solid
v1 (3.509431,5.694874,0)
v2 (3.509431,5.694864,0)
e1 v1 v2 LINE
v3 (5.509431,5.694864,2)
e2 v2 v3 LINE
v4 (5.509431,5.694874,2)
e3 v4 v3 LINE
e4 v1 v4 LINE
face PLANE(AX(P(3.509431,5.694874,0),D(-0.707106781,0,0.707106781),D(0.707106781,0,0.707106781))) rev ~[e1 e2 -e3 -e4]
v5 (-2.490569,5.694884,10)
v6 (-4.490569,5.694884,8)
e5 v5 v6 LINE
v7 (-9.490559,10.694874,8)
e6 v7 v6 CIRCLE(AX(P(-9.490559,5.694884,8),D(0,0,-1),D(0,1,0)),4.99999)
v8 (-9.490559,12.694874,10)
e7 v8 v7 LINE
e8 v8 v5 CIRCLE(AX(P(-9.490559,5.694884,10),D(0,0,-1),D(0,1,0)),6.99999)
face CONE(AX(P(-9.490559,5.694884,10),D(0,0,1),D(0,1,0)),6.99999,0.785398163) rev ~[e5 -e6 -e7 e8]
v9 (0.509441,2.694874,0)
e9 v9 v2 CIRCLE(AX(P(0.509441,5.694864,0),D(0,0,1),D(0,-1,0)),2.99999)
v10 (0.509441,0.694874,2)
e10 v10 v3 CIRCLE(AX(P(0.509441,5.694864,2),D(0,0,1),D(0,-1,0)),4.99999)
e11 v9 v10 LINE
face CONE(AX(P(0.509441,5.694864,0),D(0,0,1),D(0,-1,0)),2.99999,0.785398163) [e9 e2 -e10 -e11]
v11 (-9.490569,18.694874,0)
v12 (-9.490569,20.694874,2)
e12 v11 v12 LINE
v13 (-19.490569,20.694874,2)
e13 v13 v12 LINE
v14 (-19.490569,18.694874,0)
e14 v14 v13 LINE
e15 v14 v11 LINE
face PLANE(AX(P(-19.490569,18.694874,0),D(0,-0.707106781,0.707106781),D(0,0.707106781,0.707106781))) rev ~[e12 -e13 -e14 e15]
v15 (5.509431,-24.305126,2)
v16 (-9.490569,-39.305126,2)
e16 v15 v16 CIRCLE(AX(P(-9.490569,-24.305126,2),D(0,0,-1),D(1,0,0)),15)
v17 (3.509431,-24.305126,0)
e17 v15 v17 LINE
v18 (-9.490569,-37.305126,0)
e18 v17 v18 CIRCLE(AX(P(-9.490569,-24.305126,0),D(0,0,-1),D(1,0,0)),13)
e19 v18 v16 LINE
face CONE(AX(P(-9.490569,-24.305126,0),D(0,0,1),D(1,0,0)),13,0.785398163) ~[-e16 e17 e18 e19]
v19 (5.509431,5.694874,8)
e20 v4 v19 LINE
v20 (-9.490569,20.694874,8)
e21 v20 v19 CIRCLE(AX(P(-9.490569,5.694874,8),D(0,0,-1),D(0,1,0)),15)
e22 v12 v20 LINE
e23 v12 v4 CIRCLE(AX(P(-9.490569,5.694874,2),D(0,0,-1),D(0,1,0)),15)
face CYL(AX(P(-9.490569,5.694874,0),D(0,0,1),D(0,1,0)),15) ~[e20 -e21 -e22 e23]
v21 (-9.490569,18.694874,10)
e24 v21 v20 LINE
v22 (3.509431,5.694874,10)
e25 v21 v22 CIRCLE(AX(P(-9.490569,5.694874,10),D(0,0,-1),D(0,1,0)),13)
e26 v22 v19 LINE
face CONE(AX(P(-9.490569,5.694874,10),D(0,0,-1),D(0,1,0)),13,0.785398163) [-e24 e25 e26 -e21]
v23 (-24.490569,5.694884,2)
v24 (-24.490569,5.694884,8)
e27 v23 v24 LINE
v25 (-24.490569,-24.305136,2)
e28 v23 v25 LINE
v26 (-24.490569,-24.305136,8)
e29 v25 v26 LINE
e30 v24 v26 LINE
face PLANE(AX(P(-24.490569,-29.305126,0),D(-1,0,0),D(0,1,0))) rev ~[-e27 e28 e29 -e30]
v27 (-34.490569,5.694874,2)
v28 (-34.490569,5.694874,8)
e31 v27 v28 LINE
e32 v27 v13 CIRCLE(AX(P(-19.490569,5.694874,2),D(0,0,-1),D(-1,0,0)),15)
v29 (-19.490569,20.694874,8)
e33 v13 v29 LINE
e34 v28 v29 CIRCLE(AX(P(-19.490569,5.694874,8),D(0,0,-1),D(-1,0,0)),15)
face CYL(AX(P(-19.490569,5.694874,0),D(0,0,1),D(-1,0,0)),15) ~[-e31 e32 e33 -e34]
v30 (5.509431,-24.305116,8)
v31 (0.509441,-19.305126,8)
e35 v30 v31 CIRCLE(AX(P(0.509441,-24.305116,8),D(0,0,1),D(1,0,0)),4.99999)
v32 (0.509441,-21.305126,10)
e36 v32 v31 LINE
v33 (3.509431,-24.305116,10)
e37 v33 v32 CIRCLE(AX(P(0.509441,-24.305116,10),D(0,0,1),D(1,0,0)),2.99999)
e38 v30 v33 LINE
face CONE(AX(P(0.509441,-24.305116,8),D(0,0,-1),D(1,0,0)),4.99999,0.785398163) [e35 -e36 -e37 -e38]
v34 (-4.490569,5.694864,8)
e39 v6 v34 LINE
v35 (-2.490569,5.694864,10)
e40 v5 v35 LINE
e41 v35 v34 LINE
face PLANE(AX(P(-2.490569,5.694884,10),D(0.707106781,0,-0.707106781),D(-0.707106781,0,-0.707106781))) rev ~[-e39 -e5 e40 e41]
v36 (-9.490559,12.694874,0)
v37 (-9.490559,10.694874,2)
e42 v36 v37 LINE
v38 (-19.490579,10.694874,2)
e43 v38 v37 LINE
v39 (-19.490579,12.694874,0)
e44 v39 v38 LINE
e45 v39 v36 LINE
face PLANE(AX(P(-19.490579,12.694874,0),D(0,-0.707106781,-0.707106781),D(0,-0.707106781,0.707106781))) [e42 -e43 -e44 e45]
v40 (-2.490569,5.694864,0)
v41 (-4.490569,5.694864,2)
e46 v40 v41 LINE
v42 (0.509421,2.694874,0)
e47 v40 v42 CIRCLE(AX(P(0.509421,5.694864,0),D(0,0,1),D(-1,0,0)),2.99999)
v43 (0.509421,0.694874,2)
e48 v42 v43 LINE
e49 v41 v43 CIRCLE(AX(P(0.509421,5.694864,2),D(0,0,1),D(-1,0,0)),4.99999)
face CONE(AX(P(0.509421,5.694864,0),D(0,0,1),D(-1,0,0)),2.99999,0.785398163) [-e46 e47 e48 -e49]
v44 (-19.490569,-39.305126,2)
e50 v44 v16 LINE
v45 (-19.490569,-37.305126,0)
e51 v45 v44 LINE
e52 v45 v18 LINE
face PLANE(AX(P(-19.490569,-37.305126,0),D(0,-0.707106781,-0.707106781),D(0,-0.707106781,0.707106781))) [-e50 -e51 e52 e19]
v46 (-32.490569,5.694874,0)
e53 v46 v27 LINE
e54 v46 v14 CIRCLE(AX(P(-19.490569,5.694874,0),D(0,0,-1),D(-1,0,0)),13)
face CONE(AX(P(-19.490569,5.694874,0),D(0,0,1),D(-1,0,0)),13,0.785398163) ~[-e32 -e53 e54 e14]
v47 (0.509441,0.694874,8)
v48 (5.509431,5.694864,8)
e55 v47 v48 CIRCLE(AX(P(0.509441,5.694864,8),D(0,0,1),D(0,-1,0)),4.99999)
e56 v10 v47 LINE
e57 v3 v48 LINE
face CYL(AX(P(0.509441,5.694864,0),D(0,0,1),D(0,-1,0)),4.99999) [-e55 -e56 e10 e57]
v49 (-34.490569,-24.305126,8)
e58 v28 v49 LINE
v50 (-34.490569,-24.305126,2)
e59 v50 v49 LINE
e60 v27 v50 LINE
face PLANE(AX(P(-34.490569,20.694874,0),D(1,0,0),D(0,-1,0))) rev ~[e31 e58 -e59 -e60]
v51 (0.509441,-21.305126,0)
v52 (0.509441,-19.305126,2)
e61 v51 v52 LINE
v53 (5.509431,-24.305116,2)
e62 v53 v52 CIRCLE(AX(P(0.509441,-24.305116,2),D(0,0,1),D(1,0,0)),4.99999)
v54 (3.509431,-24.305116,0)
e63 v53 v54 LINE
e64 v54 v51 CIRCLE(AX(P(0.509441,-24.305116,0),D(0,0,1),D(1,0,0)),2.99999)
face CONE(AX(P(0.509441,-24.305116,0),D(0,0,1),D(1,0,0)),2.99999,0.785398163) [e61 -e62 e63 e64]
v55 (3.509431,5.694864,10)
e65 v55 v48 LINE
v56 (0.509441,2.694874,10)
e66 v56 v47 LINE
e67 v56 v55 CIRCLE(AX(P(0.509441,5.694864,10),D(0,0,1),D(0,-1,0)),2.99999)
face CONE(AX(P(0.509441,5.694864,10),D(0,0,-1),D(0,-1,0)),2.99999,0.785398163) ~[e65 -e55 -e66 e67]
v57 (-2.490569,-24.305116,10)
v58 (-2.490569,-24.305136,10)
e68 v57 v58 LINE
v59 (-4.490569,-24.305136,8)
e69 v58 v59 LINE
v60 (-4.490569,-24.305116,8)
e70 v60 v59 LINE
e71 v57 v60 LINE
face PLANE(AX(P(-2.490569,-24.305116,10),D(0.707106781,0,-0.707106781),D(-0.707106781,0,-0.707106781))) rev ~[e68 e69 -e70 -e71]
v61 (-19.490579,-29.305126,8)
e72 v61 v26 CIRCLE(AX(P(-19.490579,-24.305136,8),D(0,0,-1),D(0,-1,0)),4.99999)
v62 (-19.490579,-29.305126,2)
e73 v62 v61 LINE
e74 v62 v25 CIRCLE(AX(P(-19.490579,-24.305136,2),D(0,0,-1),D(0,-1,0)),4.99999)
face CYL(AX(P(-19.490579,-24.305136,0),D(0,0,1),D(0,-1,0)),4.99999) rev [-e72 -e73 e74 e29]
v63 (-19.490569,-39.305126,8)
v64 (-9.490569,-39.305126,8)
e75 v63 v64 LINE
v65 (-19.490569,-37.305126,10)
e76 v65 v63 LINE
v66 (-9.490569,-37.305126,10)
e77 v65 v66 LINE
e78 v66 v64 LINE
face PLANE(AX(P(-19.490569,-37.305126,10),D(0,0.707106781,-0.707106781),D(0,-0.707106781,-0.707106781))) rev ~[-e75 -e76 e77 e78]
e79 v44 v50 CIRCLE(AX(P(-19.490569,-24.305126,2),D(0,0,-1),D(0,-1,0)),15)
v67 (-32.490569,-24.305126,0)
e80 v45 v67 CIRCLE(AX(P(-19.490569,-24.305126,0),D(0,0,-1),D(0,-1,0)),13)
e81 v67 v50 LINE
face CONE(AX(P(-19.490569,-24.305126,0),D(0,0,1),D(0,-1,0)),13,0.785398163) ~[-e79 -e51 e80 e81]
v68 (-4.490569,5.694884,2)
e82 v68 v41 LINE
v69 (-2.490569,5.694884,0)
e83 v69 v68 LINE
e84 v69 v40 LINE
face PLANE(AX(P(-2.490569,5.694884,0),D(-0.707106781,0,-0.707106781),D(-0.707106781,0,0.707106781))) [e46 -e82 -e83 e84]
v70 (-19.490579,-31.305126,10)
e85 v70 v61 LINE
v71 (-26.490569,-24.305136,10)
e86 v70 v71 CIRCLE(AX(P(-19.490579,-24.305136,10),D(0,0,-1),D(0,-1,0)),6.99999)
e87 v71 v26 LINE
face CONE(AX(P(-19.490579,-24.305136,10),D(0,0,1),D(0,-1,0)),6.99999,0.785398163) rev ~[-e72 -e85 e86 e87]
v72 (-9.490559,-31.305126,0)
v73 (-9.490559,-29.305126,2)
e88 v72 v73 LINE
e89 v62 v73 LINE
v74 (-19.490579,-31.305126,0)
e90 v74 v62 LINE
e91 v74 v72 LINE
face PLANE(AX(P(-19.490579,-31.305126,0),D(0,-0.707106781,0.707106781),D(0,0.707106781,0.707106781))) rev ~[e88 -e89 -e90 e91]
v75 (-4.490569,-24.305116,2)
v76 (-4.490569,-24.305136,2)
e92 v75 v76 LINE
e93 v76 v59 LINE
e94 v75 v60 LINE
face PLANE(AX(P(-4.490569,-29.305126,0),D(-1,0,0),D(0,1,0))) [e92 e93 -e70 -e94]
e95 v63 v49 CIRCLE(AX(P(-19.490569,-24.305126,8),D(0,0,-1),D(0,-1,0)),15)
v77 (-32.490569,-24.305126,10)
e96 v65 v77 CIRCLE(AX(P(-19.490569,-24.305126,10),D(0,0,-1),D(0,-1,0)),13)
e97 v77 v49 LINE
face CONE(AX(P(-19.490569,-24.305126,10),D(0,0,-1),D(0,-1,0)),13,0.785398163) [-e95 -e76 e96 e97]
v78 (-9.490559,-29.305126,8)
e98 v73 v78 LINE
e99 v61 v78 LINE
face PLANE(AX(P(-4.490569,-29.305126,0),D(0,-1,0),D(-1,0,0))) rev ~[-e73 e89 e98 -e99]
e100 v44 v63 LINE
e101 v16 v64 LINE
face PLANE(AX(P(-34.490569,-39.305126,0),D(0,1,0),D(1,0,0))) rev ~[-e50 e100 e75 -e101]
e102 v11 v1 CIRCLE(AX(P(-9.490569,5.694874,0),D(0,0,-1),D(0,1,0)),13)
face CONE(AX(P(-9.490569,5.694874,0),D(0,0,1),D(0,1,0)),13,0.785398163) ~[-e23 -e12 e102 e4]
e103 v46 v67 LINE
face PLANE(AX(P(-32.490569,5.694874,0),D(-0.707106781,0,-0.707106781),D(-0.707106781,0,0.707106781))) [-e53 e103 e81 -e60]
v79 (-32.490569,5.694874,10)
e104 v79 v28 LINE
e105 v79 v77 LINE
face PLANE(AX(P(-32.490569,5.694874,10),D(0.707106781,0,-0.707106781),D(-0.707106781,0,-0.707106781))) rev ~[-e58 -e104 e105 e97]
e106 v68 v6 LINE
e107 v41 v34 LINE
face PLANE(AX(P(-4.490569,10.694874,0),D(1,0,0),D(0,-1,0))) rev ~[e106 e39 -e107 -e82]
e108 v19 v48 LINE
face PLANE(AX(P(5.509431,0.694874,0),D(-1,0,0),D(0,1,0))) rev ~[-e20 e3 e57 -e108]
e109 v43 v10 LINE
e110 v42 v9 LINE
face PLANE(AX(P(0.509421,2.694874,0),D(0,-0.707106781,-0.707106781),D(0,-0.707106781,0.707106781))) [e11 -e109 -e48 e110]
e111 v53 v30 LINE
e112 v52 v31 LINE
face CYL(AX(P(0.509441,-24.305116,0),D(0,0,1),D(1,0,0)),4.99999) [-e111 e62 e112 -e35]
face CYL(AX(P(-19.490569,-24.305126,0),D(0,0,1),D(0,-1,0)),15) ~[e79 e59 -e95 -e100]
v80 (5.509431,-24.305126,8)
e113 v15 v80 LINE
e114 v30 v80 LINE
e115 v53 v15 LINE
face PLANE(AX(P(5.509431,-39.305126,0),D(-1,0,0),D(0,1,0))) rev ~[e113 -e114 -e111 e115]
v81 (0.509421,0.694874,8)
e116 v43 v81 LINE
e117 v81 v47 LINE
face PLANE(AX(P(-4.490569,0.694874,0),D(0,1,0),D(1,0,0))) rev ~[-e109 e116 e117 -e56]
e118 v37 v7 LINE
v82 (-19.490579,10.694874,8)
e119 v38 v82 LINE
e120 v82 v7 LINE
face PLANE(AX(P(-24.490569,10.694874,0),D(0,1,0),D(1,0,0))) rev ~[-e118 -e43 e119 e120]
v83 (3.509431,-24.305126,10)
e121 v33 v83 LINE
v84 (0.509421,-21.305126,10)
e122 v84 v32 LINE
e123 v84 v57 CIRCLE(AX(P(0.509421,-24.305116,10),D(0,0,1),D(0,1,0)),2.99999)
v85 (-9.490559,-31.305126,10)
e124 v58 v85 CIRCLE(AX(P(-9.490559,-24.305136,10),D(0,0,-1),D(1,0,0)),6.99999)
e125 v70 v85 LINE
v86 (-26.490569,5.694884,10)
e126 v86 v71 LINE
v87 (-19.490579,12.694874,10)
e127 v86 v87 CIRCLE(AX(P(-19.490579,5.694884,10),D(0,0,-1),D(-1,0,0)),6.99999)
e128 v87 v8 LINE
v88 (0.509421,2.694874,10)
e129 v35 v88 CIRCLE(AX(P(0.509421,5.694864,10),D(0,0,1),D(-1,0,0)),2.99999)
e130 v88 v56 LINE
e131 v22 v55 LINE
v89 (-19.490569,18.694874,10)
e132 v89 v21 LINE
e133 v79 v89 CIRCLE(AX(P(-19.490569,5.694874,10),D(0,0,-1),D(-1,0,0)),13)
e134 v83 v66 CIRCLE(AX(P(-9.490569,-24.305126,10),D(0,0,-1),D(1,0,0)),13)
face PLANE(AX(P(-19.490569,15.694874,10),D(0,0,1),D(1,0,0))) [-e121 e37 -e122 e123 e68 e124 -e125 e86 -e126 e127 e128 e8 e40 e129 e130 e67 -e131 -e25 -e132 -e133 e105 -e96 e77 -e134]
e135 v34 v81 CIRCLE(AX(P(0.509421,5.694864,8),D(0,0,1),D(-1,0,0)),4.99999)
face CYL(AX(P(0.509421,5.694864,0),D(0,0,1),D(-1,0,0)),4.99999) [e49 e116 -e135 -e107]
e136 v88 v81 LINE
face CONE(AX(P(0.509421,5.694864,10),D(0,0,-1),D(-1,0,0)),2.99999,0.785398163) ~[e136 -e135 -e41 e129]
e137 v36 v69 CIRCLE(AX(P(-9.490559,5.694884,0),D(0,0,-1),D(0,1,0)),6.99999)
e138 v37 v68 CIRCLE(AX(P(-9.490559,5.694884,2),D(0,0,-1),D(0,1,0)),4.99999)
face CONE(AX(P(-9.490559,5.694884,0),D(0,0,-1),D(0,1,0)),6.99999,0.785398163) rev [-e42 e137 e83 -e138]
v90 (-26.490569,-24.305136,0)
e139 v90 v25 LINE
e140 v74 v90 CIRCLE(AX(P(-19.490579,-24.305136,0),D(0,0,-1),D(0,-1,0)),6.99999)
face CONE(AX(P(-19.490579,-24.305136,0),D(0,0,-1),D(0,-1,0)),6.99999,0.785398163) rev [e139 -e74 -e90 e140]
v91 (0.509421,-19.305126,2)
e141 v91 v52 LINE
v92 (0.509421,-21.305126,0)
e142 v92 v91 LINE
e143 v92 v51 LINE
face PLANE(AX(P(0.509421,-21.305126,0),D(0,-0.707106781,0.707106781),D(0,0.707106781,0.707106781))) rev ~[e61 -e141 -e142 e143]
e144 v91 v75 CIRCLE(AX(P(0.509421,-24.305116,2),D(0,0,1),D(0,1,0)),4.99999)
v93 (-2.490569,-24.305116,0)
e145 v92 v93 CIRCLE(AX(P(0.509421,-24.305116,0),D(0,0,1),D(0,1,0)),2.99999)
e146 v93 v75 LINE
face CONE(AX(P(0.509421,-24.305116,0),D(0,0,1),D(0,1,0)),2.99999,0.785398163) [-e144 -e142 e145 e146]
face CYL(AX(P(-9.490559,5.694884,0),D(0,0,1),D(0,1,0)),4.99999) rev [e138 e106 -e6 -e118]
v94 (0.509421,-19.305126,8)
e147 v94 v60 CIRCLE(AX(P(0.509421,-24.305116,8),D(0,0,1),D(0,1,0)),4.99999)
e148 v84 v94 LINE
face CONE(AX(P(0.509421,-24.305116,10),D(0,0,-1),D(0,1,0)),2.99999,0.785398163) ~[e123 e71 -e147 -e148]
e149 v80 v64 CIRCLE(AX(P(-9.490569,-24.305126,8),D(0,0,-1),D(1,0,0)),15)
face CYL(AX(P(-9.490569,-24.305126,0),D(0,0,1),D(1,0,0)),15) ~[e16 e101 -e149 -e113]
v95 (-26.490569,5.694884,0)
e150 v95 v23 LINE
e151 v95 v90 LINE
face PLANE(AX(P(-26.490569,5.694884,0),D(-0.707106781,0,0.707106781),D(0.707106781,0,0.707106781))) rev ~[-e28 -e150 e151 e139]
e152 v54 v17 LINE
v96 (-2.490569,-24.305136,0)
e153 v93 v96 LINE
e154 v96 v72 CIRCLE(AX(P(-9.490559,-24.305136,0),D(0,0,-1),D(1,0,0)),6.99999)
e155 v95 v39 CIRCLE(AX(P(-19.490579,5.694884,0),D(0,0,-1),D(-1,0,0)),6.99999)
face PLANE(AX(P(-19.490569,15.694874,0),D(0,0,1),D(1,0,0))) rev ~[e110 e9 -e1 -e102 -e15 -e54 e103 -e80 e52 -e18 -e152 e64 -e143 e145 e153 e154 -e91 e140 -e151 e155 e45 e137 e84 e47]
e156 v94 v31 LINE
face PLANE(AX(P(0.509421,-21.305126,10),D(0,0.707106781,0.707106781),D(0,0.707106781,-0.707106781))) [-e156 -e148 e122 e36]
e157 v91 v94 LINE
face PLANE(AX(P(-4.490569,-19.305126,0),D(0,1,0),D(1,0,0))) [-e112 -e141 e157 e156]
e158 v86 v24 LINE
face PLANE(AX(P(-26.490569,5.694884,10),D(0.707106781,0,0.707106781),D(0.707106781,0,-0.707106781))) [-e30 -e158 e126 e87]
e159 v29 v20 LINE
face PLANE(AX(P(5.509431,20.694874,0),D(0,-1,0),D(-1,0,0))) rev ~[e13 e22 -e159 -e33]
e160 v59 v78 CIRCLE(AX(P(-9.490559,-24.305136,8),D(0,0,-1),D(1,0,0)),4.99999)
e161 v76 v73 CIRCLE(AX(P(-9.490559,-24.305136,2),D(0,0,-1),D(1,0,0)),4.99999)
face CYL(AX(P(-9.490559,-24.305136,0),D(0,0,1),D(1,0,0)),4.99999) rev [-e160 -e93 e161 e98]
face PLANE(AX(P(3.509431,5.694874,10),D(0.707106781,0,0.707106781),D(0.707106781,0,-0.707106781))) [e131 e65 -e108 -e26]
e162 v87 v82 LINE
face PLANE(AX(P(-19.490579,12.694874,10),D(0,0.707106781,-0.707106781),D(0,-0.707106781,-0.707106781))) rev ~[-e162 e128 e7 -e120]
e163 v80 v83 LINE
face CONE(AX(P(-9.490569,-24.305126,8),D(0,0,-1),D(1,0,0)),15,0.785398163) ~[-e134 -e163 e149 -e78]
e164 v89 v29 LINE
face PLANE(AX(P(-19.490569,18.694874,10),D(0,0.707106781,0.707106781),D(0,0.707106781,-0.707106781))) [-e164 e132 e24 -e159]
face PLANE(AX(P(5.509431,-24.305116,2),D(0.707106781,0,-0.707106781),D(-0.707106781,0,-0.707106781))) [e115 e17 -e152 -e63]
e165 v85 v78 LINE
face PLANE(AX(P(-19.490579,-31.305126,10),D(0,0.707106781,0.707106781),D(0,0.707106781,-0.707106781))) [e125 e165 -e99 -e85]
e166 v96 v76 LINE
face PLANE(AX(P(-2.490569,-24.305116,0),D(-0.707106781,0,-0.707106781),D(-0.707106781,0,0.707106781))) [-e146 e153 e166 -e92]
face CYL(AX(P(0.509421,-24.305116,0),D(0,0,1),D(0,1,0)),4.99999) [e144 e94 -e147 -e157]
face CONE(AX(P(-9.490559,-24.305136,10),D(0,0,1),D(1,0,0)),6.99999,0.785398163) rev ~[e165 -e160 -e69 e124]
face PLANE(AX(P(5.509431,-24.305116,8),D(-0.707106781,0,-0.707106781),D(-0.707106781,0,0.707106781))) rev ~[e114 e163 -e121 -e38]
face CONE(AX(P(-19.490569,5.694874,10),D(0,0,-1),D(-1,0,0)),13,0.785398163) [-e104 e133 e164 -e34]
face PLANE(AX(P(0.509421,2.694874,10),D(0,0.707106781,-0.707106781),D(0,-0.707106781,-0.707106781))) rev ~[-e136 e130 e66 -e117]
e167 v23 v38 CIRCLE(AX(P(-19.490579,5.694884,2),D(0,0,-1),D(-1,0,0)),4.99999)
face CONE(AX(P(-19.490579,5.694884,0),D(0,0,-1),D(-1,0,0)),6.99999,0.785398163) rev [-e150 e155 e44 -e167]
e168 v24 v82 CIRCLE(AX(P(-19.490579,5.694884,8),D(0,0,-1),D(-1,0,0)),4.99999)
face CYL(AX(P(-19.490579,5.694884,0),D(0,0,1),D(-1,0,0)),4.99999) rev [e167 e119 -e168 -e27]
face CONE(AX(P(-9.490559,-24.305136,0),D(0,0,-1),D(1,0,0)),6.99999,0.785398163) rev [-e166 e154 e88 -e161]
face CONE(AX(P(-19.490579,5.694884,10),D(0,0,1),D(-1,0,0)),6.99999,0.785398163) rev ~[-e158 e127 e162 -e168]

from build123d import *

# Parameters (mm, degrees)
F0_W         = 10
F0_H         = 10
F1_DEPTH     = 10
F2_R         = 4.99999
F3_R         = 15
F4_T1_DEPTH  = 30
F4_T3_DEPTH  = 10
F4_T5_DEPTH  = 1e-05
F4_T7_DEPTH  = 2e-05
F4_T9_DEPTH  = 2e-05
F4_T11_DEPTH = 10.00002
F4_T13_DEPTH = 30.00002
F4_T15_DEPTH = 2e-05
F4_T17_DEPTH = 1e-05
F4_T20_ANGLE = 90
F4_T22_ANGLE = 90
F4_T24_ANGLE = 90
F4_T26_ANGLE = 90
F4_T28_ANGLE = 90
F4_T30_ANGLE = 90
F4_T32_ANGLE = 90
F4_T34_ANGLE = 90
F4_T36_ANGLE = 90
F4_T38_ANGLE = 90
F4_T40_ANGLE = 90
F4_T42_ANGLE = 90
F4_T44_ANGLE = 90
F4_T46_ANGLE = 90
F4_T48_ANGLE = 90
F4_T50_ANGLE = 90
F4_T52_ANGLE = 90
F4_T54_ANGLE = 90
F4_T56_ANGLE = 90
F4_T58_ANGLE = 90
F4_T60_ANGLE = 90
F4_T62_ANGLE = 90
F4_T64_ANGLE = 90
F4_T66_ANGLE = 90


# Not quite as in the source:
# - a fillet or chamfer that OpenCascade refuses, or shapes differently, is made with other operations: its cross-section is extruded or revolved along the edge and cut away or added
# - a fillet or chamfer is up to 0.001 mm smaller than in the source, because OpenCascade refuses the exact size


with BuildPart() as f1:
    # F0 (on Top) → F1 (new body)
    with BuildSketch(Plane.XY):
        Polygon((-4.4905686265, 20.6948744461), (-34.4905686265, 20.6948744461), (-34.4905686265, 10.6948744461), (-24.4905686265, 10.6948744461), (-4.4905686265, 10.6948744461), align=None)
        Polygon((5.5094313735, 20.6948744461), (-4.4905686265, 20.6948744461), (-4.4905686265, 10.6948744461), (-4.4905686265, 0.6948744461), (5.5094313735, 0.6948744461), align=None)
        with Locations((0.5094313735, -24.3051255539)):
            Rectangle(F0_W, F0_H)
        Polygon((-24.4905686265, 10.6948744461), (-34.4905686265, 10.6948744461), (-34.4905686265, -39.3051255539), (-24.4905686265, -39.3051255539), (-24.4905686265, -29.3051255539), align=None)
        Polygon((-4.4905686265, -29.3051255539), (-24.4905686265, -29.3051255539), (-24.4905686265, -39.3051255539), (5.5094313735, -39.3051255539), (5.5094313735, -29.3051255539), align=None)
    extrude(amount=F1_DEPTH)

    # F2 (radius 5 in the source; OpenCascade refuses exactly that, so slightly less here)
    f2_edges = [f1.edges().sort_by_distance(p)[0] for p in [
        (5.509431, 0.694874, 5),
        (-4.490569, 0.694874, 5),
        (-4.490569, 10.694874, 5),
        (5.509431, -19.305126, 5),
        (-4.490569, -19.305126, 5),
        (-24.490569, 10.694874, 5),
        (-24.490569, -29.305126, 5),
        (-4.490569, -29.305126, 5),
    ]]
    fillet(f2_edges, radius=F2_R)

    # F3
    f3_edges = [f1.edges().sort_by_distance(p)[0] for p in [
        (-34.490569, 20.694874, 5),
        (5.509431, 20.694874, 5),
        (5.509431, -39.305126, 5),
        (-34.490569, -39.305126, 5),
    ]]
    fillet(f3_edges, radius=F3_R)

    # F4: chamfer of 2 on 2 edges, made by hand

    # F4_s2 → F4_t1 (cut)
    with BuildSketch(Plane.XZ.offset(-5.6948744461)):
        Polygon((-32.4905686265, 10), (-34.4905686265, 8), (-34.4905686265, 10), align=None)
        Polygon((-32.4905686265, 0), (-34.4905686265, 2), (-34.4905686265, 0), align=None)
    extrude(amount=F4_T1_DEPTH, mode=Mode.SUBTRACT)

    # F4_s4 → F4_t3 (cut)
    with BuildSketch(Plane.YZ.offset(-19.4905686265)):
        Polygon((-37.3051255539, 0), (-39.3051255539, 2), (-39.3051255539, 0), align=None)
        Polygon((18.6948744461, 0), (20.6948744461, 2), (20.6948744461, 0), align=None)
        Polygon((-37.3051255539, 10), (-39.3051255539, 8), (-39.3051255539, 10), align=None)
        Polygon((18.6948744461, 10), (20.6948744461, 8), (20.6948744461, 10), align=None)
    extrude(amount=F4_T3_DEPTH, mode=Mode.SUBTRACT)

    # F4_s6 → F4_t5 (cut)
    with BuildSketch(Plane.XZ.offset(24.3051155539)):
        Polygon((5.5094313735, 2), (3.5094313735, 0), (5.5094313735, 0), align=None)
        Polygon((5.5094313735, 8), (3.5094313735, 10), (5.5094313735, 10), align=None)
    extrude(amount=F4_T5_DEPTH, mode=Mode.SUBTRACT)

    # F4_s8 → F4_t7 (cut)
    with BuildSketch(Plane.YZ.offset(0.5094213735)):
        Polygon((-21.3051255539, 0), (-19.3051255539, 2), (-19.3051255539, 0), align=None)
        Polygon((2.6948744461, 0), (0.6948744461, 2), (0.6948744461, 0), align=None)
        Polygon((-21.3051255539, 10), (-19.3051255539, 8), (-19.3051255539, 10), align=None)
        Polygon((2.6948744461, 10), (0.6948744461, 8), (0.6948744461, 10), align=None)
    extrude(amount=F4_T7_DEPTH, mode=Mode.SUBTRACT)

    # F4_s10 → F4_t9 (cut)
    with BuildSketch(Plane.XZ.offset(24.3051155539)):
        Polygon((-2.4905686265, 0), (-4.4905686265, 2), (-4.4905686265, 0), align=None)
        Polygon((-2.4905686265, 10), (-4.4905686265, 8), (-4.4905686265, 10), align=None)
    extrude(amount=F4_T9_DEPTH, mode=Mode.SUBTRACT)

    # F4_s12 → F4_t11 (cut)
    with BuildSketch(Plane.YZ.offset(-19.4905786265)):
        Polygon((-31.3051255539, 0), (-29.3051255539, 2), (-29.3051255539, 0), align=None)
        Polygon((12.6948744461, 0), (10.6948744461, 2), (10.6948744461, 0), align=None)
        Polygon((-31.3051255539, 10), (-29.3051255539, 8), (-29.3051255539, 10), align=None)
        Polygon((12.6948744461, 10), (10.6948744461, 8), (10.6948744461, 10), align=None)
    extrude(amount=F4_T11_DEPTH, mode=Mode.SUBTRACT)

    # F4_s14 → F4_t13 (cut)
    with BuildSketch(Plane.XZ.offset(-5.6948844461)):
        Polygon((-26.4905686265, 0), (-24.4905686265, 2), (-24.4905686265, 0), align=None)
        Polygon((-26.4905686265, 10), (-24.4905686265, 8), (-24.4905686265, 10), align=None)
    extrude(amount=F4_T13_DEPTH, mode=Mode.SUBTRACT)

    # F4_s16 → F4_t15 (cut)
    with BuildSketch(Plane.XZ.offset(-5.6948844461)):
        Polygon((-2.4905686265, 0), (-4.4905686265, 2), (-4.4905686265, 0), align=None)
        Polygon((-2.4905686265, 10), (-4.4905686265, 8), (-4.4905686265, 10), align=None)
    extrude(amount=F4_T15_DEPTH, mode=Mode.SUBTRACT)

    # F4_s18 → F4_t17 (cut)
    with BuildSketch(Plane.XZ.offset(-5.6948744461)):
        Polygon((3.5094313735, 0), (5.5094313735, 2), (5.5094313735, 0), align=None)
        Polygon((3.5094313735, 10), (5.5094313735, 8), (5.5094313735, 10), align=None)
    extrude(amount=F4_T17_DEPTH, mode=Mode.SUBTRACT)

    # F4_s19 → F4_t20 (revolve, cut)
    with BuildSketch(Plane.XZ.offset(-5.6948744461)):
        Polygon((-32.4905686265, 0), (-34.4905686265, 2), (-34.4905686265, 0), align=None)
    revolve(axis=Axis((-19.4905686265, 5.6948744461, 0), (0, 0, -1)), revolution_arc=F4_T20_ANGLE, mode=Mode.SUBTRACT)

    # F4_s21 → F4_t22 (revolve, cut)
    with BuildSketch(Plane.YZ.offset(-19.4905686265)):
        Polygon((-37.3051255539, 0), (-39.3051255539, 2), (-39.3051255539, 0), align=None)
    revolve(axis=Axis((-19.4905686265, -24.3051255539, 0), (0, 0, -1)), revolution_arc=F4_T22_ANGLE, mode=Mode.SUBTRACT)

    # F4_s23 → F4_t24 (revolve, cut)
    with BuildSketch(Plane.XZ.offset(24.3051255539)):
        Polygon((3.5094313735, 0), (5.5094313735, 2), (5.5094313735, 0), align=None)
    revolve(axis=Axis((-9.4905686265, -24.3051255539, 0), (0, 0, -1)), revolution_arc=F4_T24_ANGLE, mode=Mode.SUBTRACT)

    # F4_s25 → F4_t26 (revolve, cut)
    with BuildSketch(Plane.XZ.offset(24.3051155539)):
        Polygon((3.5094313735, 0), (5.5094313735, 2), (5.5094313735, 0), align=None)
    revolve(axis=Axis((0.5094413735, -24.3051155539, 0), (0, 0, 1)), revolution_arc=F4_T26_ANGLE, mode=Mode.SUBTRACT)

    # F4_s27 → F4_t28 (revolve, cut)
    with BuildSketch(Plane.YZ.offset(0.5094213735)):
        Polygon((-21.3051255539, 0), (-19.3051255539, 2), (-19.3051255539, 0), align=None)
    revolve(axis=Axis((0.5094213735, -24.3051155539, 0), (0, 0, 1)), revolution_arc=F4_T28_ANGLE, mode=Mode.SUBTRACT)

    # F4_s29 → F4_t30 (revolve, cut)
    with BuildSketch(Plane.XZ.offset(24.3051355539)):
        Polygon((-2.4905686265, 0), (-4.4905686265, 2), (-4.4905686265, 0), align=None)
    revolve(axis=Axis((-9.4905586265, -24.3051355539, 0), (0, 0, -1)), revolution_arc=F4_T30_ANGLE, mode=Mode.SUBTRACT)

    # F4_s31 → F4_t32 (revolve, cut)
    with BuildSketch(Plane.YZ.offset(-19.4905786265)):
        Polygon((-31.3051255539, 0), (-29.3051255539, 2), (-29.3051255539, 0), align=None)
    revolve(axis=Axis((-19.4905786265, -24.3051355539, 0), (0, 0, -1)), revolution_arc=F4_T32_ANGLE, mode=Mode.SUBTRACT)

    # F4_s33 → F4_t34 (revolve, cut)
    with BuildSketch(Plane.XZ.offset(-5.6948844461)):
        Polygon((-26.4905686265, 0), (-24.4905686265, 2), (-24.4905686265, 0), align=None)
    revolve(axis=Axis((-19.4905786265, 5.6948844461, 0), (0, 0, -1)), revolution_arc=F4_T34_ANGLE, mode=Mode.SUBTRACT)

    # F4_s35 → F4_t36 (revolve, cut)
    with BuildSketch(Plane.YZ.offset(-9.4905586265)):
        Polygon((12.6948744461, 0), (10.6948744461, 2), (10.6948744461, 0), align=None)
    revolve(axis=Axis((-9.4905586265, 5.6948844461, 0), (0, 0, -1)), revolution_arc=F4_T36_ANGLE, mode=Mode.SUBTRACT)

    # F4_s37 → F4_t38 (revolve, cut)
    with BuildSketch(Plane.XZ.offset(-5.6948644461)):
        Polygon((-2.4905686265, 0), (-4.4905686265, 2), (-4.4905686265, 0), align=None)
    revolve(axis=Axis((0.5094213735, 5.6948644461, 0), (0, 0, 1)), revolution_arc=F4_T38_ANGLE, mode=Mode.SUBTRACT)

    # F4_s39 → F4_t40 (revolve, cut)
    with BuildSketch(Plane.YZ.offset(0.5094413735)):
        Polygon((2.6948744461, 0), (0.6948744461, 2), (0.6948744461, 0), align=None)
    revolve(axis=Axis((0.5094413735, 5.6948644461, 0), (0, 0, 1)), revolution_arc=F4_T40_ANGLE, mode=Mode.SUBTRACT)

    # F4_s41 → F4_t42 (revolve, cut)
    with BuildSketch(Plane.YZ.offset(-9.4905686265)):
        Polygon((18.6948744461, 0), (20.6948744461, 2), (20.6948744461, 0), align=None)
    revolve(axis=Axis((-9.4905686265, 5.6948744461, 0), (0, 0, -1)), revolution_arc=F4_T42_ANGLE, mode=Mode.SUBTRACT)

    # F4_s43 → F4_t44 (revolve, cut)
    with BuildSketch(Plane.XZ.offset(-5.6948744461)):
        Polygon((-32.4905686265, 10), (-34.4905686265, 8), (-34.4905686265, 10), align=None)
    revolve(axis=Axis((-19.4905686265, 5.6948744461, 10), (0, 0, -1)), revolution_arc=F4_T44_ANGLE, mode=Mode.SUBTRACT)

    # F4_s45 → F4_t46 (revolve, cut)
    with BuildSketch(Plane.YZ.offset(-19.4905686265)):
        Polygon((-37.3051255539, 10), (-39.3051255539, 8), (-39.3051255539, 10), align=None)
    revolve(axis=Axis((-19.4905686265, -24.3051255539, 10), (0, 0, -1)), revolution_arc=F4_T46_ANGLE, mode=Mode.SUBTRACT)

    # F4_s47 → F4_t48 (revolve, cut)
    with BuildSketch(Plane.XZ.offset(24.3051255539)):
        Polygon((5.5094313735, 8), (3.5094313735, 10), (5.5094313735, 10), align=None)
    revolve(axis=Axis((-9.4905686265, -24.3051255539, 10), (0, 0, -1)), revolution_arc=F4_T48_ANGLE, mode=Mode.SUBTRACT)

    # F4_s49 → F4_t50 (revolve, cut)
    with BuildSketch(Plane.XZ.offset(24.3051155539)):
        Polygon((5.5094313735, 8), (3.5094313735, 10), (5.5094313735, 10), align=None)
    revolve(axis=Axis((0.5094413735, -24.3051155539, 10), (0, 0, 1)), revolution_arc=F4_T50_ANGLE, mode=Mode.SUBTRACT)

    # F4_s51 → F4_t52 (revolve, cut)
    with BuildSketch(Plane.YZ.offset(0.5094213735)):
        Polygon((-21.3051255539, 10), (-19.3051255539, 8), (-19.3051255539, 10), align=None)
    revolve(axis=Axis((0.5094213735, -24.3051155539, 10), (0, 0, 1)), revolution_arc=F4_T52_ANGLE, mode=Mode.SUBTRACT)

    # F4_s53 → F4_t54 (revolve, cut)
    with BuildSketch(Plane.XZ.offset(24.3051355539)):
        Polygon((-2.4905686265, 10), (-4.4905686265, 8), (-4.4905686265, 10), align=None)
    revolve(axis=Axis((-9.4905586265, -24.3051355539, 10), (0, 0, -1)), revolution_arc=F4_T54_ANGLE, mode=Mode.SUBTRACT)

    # F4_s55 → F4_t56 (revolve, cut)
    with BuildSketch(Plane.YZ.offset(-19.4905786265)):
        Polygon((-31.3051255539, 10), (-29.3051255539, 8), (-29.3051255539, 10), align=None)
    revolve(axis=Axis((-19.4905786265, -24.3051355539, 10), (0, 0, -1)), revolution_arc=F4_T56_ANGLE, mode=Mode.SUBTRACT)

    # F4_s57 → F4_t58 (revolve, cut)
    with BuildSketch(Plane.XZ.offset(-5.6948844461)):
        Polygon((-26.4905686265, 10), (-24.4905686265, 8), (-24.4905686265, 10), align=None)
    revolve(axis=Axis((-19.4905786265, 5.6948844461, 10), (0, 0, -1)), revolution_arc=F4_T58_ANGLE, mode=Mode.SUBTRACT)

    # F4_s59 → F4_t60 (revolve, cut)
    with BuildSketch(Plane.YZ.offset(-9.4905586265)):
        Polygon((12.6948744461, 10), (10.6948744461, 8), (10.6948744461, 10), align=None)
    revolve(axis=Axis((-9.4905586265, 5.6948844461, 10), (0, 0, -1)), revolution_arc=F4_T60_ANGLE, mode=Mode.SUBTRACT)

    # F4_s61 → F4_t62 (revolve, cut)
    with BuildSketch(Plane.XZ.offset(-5.6948644461)):
        Polygon((-2.4905686265, 10), (-4.4905686265, 8), (-4.4905686265, 10), align=None)
    revolve(axis=Axis((0.5094213735, 5.6948644461, 10), (0, 0, 1)), revolution_arc=F4_T62_ANGLE, mode=Mode.SUBTRACT)

    # F4_s63 → F4_t64 (revolve, cut)
    with BuildSketch(Plane.YZ.offset(0.5094413735)):
        Polygon((2.6948744461, 10), (0.6948744461, 8), (0.6948744461, 10), align=None)
    revolve(axis=Axis((0.5094413735, 5.6948644461, 10), (0, 0, 1)), revolution_arc=F4_T64_ANGLE, mode=Mode.SUBTRACT)

    # F4_s65 → F4_t66 (revolve, cut)
    with BuildSketch(Plane.YZ.offset(-9.4905686265)):
        Polygon((18.6948744461, 10), (20.6948744461, 8), (20.6948744461, 10), align=None)
    revolve(axis=Axis((-9.4905686265, 5.6948744461, 10), (0, 0, -1)), revolution_arc=F4_T66_ANGLE, mode=Mode.SUBTRACT)


solid = f1.part
